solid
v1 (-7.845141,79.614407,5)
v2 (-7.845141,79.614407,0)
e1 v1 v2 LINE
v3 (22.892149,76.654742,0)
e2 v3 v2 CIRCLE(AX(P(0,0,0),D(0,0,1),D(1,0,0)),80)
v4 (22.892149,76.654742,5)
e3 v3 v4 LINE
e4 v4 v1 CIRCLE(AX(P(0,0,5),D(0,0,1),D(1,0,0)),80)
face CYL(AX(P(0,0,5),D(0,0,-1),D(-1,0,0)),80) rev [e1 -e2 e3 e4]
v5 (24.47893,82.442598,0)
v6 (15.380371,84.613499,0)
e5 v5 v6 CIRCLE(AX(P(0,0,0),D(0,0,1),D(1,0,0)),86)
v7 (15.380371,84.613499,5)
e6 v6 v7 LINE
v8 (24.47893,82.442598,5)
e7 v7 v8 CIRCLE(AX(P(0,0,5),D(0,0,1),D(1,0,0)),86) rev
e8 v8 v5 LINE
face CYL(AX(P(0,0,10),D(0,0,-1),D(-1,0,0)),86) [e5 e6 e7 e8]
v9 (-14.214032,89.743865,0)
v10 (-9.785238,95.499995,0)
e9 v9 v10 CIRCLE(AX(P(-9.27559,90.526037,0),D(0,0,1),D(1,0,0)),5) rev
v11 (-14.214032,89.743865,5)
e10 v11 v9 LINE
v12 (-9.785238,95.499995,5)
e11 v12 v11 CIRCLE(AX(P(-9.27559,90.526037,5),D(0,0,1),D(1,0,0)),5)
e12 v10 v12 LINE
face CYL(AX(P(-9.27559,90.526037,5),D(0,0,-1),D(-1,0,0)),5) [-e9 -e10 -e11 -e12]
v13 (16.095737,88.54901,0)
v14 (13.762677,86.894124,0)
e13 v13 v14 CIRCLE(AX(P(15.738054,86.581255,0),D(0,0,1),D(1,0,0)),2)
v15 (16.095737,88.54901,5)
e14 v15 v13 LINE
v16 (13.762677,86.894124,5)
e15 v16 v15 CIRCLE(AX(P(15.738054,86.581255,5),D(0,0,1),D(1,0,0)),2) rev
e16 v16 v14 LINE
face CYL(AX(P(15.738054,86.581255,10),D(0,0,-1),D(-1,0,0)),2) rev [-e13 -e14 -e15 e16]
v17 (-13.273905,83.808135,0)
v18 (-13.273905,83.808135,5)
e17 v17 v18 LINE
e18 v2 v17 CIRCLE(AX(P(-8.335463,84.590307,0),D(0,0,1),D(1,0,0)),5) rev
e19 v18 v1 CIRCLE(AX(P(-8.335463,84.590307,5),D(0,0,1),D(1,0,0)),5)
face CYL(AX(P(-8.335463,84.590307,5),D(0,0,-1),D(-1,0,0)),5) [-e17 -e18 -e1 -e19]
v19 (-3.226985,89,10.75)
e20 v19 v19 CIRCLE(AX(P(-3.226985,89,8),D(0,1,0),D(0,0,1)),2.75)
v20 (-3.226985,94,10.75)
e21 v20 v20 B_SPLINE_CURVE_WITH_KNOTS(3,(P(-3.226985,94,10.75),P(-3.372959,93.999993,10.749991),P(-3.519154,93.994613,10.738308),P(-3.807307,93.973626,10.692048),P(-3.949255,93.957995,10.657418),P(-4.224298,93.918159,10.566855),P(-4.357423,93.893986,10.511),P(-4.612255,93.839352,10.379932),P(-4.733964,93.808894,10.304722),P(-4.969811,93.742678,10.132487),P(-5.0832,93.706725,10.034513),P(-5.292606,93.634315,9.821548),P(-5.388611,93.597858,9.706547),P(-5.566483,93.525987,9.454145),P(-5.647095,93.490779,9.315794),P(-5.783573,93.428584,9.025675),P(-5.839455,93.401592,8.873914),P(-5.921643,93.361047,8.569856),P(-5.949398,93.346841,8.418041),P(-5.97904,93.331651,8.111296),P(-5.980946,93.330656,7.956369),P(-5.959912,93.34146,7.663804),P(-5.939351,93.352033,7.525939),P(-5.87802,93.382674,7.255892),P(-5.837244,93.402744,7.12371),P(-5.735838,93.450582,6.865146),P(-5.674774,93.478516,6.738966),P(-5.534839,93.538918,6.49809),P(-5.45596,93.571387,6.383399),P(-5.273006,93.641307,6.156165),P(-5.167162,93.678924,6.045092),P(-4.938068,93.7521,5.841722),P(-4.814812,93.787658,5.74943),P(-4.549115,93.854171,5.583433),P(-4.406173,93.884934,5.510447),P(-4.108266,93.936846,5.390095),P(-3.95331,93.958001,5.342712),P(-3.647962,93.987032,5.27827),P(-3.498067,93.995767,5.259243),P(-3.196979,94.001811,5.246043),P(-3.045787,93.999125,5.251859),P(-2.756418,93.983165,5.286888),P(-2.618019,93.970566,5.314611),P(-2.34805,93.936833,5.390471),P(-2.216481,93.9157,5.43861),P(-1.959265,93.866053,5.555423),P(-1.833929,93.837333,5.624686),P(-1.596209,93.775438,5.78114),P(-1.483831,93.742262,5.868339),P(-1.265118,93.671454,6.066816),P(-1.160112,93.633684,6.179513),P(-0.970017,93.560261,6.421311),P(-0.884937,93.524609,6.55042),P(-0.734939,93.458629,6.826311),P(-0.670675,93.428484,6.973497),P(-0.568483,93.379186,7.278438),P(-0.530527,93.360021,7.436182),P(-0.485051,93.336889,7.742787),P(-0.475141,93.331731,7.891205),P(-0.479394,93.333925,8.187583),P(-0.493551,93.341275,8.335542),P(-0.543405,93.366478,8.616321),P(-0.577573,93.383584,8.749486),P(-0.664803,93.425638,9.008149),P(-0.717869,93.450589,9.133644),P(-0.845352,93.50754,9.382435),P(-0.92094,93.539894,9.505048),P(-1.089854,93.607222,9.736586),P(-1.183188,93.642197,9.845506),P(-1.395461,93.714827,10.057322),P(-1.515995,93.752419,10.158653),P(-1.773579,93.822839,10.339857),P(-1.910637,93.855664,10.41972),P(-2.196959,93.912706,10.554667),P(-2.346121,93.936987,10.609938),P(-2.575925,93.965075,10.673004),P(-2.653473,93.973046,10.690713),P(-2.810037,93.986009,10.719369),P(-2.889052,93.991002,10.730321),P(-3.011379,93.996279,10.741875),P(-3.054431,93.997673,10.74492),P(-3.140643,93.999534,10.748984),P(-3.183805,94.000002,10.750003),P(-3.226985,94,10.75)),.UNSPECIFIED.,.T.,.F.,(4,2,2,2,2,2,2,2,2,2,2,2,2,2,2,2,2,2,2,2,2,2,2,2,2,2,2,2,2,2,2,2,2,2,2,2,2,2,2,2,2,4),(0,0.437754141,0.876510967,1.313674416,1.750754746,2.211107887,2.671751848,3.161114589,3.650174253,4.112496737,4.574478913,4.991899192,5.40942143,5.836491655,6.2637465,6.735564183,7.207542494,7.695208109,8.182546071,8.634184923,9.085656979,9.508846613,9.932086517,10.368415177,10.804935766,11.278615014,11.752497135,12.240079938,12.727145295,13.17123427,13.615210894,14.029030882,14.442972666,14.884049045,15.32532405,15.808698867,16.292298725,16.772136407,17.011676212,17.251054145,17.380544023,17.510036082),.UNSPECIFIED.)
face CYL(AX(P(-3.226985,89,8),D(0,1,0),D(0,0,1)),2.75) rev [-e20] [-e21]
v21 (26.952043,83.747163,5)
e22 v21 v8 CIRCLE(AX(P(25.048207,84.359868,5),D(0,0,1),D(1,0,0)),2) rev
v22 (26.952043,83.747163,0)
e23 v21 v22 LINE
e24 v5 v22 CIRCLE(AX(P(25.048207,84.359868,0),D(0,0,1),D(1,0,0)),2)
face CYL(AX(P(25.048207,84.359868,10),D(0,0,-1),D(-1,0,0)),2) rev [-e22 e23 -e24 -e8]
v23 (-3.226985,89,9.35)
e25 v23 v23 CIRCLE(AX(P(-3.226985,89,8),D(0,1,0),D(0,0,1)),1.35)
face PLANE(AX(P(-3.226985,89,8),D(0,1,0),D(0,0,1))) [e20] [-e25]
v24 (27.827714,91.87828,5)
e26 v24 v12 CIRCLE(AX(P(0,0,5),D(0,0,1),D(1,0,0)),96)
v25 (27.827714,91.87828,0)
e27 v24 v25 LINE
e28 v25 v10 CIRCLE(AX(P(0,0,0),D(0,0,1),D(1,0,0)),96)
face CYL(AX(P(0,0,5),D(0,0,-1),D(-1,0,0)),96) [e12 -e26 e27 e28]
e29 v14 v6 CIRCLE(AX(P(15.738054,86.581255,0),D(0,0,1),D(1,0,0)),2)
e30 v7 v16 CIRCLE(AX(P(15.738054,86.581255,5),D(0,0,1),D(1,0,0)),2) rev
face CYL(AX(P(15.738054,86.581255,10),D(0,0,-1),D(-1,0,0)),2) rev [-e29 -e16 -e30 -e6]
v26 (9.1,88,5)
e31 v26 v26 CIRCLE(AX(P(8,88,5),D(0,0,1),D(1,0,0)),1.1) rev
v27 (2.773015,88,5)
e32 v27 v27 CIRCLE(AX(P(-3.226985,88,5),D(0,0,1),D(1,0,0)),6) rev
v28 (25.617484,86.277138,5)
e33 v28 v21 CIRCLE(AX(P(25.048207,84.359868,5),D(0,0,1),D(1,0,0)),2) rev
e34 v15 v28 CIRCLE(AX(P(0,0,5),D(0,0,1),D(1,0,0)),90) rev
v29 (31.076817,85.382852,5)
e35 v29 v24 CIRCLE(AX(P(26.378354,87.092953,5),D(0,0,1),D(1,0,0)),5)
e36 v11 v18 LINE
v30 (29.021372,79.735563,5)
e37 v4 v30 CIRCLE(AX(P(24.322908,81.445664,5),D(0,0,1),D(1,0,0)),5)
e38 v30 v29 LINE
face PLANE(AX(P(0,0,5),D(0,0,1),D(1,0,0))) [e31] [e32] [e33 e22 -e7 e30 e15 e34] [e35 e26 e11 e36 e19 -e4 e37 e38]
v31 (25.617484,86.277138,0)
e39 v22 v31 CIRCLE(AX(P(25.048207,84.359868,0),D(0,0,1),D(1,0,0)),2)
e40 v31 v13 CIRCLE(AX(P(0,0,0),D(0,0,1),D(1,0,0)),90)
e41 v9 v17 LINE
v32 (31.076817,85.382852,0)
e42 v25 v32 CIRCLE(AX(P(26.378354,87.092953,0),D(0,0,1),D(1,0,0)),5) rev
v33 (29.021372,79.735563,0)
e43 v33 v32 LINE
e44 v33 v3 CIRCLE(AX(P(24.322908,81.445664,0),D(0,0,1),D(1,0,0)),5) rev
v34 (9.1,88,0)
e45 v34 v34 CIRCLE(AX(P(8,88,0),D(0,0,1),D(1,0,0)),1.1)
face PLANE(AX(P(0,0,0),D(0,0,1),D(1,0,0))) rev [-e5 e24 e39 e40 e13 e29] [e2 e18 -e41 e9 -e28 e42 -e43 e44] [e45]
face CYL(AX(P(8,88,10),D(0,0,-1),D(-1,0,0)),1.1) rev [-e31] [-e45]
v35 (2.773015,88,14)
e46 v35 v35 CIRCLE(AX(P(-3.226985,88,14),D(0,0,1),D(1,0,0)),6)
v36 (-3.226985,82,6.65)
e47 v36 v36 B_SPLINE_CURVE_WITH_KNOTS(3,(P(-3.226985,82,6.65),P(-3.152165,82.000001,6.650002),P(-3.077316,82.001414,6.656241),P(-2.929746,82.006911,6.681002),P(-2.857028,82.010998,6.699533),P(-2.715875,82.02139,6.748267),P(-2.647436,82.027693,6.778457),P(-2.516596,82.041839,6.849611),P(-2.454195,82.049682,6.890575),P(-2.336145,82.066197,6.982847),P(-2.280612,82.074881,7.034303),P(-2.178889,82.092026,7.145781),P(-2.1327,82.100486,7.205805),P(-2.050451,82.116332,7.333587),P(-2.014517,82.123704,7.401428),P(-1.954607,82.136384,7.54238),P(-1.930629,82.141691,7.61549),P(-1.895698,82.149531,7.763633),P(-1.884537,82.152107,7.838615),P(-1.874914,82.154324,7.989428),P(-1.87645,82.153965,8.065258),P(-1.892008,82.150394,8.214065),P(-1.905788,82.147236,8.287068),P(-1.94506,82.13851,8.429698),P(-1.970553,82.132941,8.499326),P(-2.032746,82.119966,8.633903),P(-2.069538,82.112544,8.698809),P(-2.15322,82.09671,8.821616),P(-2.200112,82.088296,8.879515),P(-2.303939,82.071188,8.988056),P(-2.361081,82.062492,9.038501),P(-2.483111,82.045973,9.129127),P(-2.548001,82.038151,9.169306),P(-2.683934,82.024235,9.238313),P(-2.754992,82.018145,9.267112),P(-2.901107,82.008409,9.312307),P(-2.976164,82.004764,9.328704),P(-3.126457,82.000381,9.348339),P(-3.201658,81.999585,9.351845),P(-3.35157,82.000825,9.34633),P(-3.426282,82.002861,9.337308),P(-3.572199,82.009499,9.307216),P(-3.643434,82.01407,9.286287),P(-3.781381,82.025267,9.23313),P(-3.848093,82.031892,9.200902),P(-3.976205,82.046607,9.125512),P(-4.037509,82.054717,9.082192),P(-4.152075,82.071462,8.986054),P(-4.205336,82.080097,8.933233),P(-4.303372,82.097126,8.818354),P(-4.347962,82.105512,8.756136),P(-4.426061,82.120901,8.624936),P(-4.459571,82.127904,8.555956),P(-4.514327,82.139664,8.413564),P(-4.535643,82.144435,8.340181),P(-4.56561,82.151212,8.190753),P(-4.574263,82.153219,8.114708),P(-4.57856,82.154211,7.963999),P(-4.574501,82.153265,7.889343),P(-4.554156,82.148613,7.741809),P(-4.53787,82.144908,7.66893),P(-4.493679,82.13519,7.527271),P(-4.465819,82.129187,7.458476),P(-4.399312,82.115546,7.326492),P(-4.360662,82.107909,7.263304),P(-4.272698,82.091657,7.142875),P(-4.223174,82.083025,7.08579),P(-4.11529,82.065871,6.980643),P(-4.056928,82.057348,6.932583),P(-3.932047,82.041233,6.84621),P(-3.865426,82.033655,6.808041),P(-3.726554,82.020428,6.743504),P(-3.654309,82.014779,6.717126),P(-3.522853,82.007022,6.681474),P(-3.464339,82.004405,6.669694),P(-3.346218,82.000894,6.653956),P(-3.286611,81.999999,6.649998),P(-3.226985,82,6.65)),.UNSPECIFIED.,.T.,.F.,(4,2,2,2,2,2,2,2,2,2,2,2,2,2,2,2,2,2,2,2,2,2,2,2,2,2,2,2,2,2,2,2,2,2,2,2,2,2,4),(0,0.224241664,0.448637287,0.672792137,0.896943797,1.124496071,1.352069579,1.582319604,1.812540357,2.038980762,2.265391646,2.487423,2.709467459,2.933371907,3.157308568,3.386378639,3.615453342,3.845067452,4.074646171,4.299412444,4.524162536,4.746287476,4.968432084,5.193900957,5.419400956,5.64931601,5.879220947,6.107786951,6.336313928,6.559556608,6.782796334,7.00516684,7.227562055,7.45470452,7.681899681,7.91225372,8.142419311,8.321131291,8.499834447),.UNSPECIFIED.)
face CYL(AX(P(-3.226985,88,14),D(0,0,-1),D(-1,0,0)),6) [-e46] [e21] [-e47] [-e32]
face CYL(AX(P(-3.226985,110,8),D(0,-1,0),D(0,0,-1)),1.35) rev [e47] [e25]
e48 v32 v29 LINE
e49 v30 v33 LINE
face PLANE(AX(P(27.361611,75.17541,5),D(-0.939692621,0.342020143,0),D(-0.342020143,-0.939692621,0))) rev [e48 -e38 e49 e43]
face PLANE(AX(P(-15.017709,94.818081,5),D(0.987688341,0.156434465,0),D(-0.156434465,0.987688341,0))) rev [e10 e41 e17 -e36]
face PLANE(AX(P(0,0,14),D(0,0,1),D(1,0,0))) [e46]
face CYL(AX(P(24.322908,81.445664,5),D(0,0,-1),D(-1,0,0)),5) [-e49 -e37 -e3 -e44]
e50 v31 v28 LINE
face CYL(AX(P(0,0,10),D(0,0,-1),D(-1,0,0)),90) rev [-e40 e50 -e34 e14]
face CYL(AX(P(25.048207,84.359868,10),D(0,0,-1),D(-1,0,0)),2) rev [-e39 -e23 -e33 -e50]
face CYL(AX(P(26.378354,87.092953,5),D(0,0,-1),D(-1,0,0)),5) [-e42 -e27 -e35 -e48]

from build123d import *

# Parameters (mm, degrees)
BOSS_EXTRUDE1_DEPTH = 5
SKETCH1_13_R        = 1.1
CUT_EXTRUDE2_DEPTH  = 10
FILLET1_R           = 2
BOSS_EXTRUDE2_DEPTH = 14
SKETCH2_R           = 1.35
CUT_EXTRUDE3_DEPTH  = 110
FILLET2_R           = 5
CUT_EXTRUDE4_START  = 200
SKETCH2_3_R         = 2.75
CUT_EXTRUDE4_DEPTH  = 111


with BuildPart() as part:
    # Sketch1 → Boss-Extrude1 (new body)
    with BuildSketch(Plane.XY):
        with BuildLine():
            Line((27.361611466, 75.175409663), (32.833933759, 90.210491595))
            ThreePointArc((32.833933759, 90.210491595), (9.201192242, 95.558035043), (-15.017708644, 94.818080697))
            Line((-15.017708644, 94.818080697), (-12.514757203, 79.015067248))
            ThreePointArc((-12.514757203, 79.015067248), (7.667660202, 79.631695869), (27.361611466, 75.175409663))
        make_face()
    extrude(amount=BOSS_EXTRUDE1_DEPTH)

    # Sketch1<13> → Cut-Extrude2 (cut)
    with BuildSketch(Plane.XY):
        with BuildLine():
            ThreePointArc((13.453363993, 84.941197291), (19.959187303, 83.651843029), (26.346302102, 81.864964213))
            Line((26.346302102, 81.864964213), (27.571711502, 85.672636967))
            ThreePointArc((27.571711502, 85.672636967), (20.887521597, 87.542626426), (14.079101854, 88.891950654))
            Line((14.079101854, 88.891950654), (13.453363993, 84.941197291))
        make_face()
        with Locations((8, 88)):
            Circle(SKETCH1_13_R)
    extrude(amount=CUT_EXTRUDE2_DEPTH, mode=Mode.SUBTRACT)

    # Fillet1
    fillet1_edges = [part.edges().sort_by_distance(p)[0] for p in [
        (26.346302102, 81.864964213, 2.5),
        (27.571711502, 85.672636967, 2.5),
        (14.079101854, 88.891950654, 2.5),
        (13.453363993, 84.941197291, 2.5),
    ]]
    fillet(fillet1_edges, radius=FILLET1_R - 0.0001)  # a hair under: the kernel refuses the full size

    # Sketch1<14> → Boss-Extrude2 (add)
    with BuildSketch(Plane.XY):
        with BuildLine():
            ThreePointArc((-0.5, 93.344488005), (-9.226985142, 88), (-0.5, 82.655511995))
            Line((-0.5, 82.655511995), (-0.5, 93.344488005))
        make_face()
        with BuildLine():
            Line((-0.5, 93.344488005), (-0.5, 82.655511995))
            ThreePointArc((-0.5, 82.655511995), (1.889747744, 84.866464525), (2.773014858, 88))
            ThreePointArc((2.773014858, 88), (1.889747744, 91.133535475), (-0.5, 93.344488005))
        make_face()
    extrude(amount=BOSS_EXTRUDE2_DEPTH)

    # Sketch2 → Cut-Extrude3 (cut)
    with BuildSketch(Plane(origin=(0, 0, 0), x_dir=(1, 0, 0), z_dir=(0, 1, 0))):
        with Locations(Location((-3.226985142, -8, 0), (0, 0, 90))):
            Circle(SKETCH2_R)
    extrude(amount=CUT_EXTRUDE3_DEPTH, mode=Mode.SUBTRACT)

    # Fillet2
    fillet2_edges = [part.edges().sort_by_distance(p)[0] for p in [
        (27.361611466, 75.175409663, 2.5),
        (-12.514757203, 79.015067248, 2.5),
        (-15.017708644, 94.818080697, 2.5),
        (32.833933759, 90.210491595, 2.5),
    ]]
    fillet(fillet2_edges, radius=FILLET2_R)

    # Sketch2<3> → Cut-Extrude4 (cut)
    with BuildSketch(Plane(origin=(0, 0, 0), x_dir=(1, 0, 0), z_dir=(0, 1, 0)).offset(CUT_EXTRUDE4_START)):
        with Locations(Location((-3.226985142, -8, 0), (0, 0, 270))):
            Circle(SKETCH2_3_R)
    extrude(amount=-CUT_EXTRUDE4_DEPTH, mode=Mode.SUBTRACT)


solid = part.part
